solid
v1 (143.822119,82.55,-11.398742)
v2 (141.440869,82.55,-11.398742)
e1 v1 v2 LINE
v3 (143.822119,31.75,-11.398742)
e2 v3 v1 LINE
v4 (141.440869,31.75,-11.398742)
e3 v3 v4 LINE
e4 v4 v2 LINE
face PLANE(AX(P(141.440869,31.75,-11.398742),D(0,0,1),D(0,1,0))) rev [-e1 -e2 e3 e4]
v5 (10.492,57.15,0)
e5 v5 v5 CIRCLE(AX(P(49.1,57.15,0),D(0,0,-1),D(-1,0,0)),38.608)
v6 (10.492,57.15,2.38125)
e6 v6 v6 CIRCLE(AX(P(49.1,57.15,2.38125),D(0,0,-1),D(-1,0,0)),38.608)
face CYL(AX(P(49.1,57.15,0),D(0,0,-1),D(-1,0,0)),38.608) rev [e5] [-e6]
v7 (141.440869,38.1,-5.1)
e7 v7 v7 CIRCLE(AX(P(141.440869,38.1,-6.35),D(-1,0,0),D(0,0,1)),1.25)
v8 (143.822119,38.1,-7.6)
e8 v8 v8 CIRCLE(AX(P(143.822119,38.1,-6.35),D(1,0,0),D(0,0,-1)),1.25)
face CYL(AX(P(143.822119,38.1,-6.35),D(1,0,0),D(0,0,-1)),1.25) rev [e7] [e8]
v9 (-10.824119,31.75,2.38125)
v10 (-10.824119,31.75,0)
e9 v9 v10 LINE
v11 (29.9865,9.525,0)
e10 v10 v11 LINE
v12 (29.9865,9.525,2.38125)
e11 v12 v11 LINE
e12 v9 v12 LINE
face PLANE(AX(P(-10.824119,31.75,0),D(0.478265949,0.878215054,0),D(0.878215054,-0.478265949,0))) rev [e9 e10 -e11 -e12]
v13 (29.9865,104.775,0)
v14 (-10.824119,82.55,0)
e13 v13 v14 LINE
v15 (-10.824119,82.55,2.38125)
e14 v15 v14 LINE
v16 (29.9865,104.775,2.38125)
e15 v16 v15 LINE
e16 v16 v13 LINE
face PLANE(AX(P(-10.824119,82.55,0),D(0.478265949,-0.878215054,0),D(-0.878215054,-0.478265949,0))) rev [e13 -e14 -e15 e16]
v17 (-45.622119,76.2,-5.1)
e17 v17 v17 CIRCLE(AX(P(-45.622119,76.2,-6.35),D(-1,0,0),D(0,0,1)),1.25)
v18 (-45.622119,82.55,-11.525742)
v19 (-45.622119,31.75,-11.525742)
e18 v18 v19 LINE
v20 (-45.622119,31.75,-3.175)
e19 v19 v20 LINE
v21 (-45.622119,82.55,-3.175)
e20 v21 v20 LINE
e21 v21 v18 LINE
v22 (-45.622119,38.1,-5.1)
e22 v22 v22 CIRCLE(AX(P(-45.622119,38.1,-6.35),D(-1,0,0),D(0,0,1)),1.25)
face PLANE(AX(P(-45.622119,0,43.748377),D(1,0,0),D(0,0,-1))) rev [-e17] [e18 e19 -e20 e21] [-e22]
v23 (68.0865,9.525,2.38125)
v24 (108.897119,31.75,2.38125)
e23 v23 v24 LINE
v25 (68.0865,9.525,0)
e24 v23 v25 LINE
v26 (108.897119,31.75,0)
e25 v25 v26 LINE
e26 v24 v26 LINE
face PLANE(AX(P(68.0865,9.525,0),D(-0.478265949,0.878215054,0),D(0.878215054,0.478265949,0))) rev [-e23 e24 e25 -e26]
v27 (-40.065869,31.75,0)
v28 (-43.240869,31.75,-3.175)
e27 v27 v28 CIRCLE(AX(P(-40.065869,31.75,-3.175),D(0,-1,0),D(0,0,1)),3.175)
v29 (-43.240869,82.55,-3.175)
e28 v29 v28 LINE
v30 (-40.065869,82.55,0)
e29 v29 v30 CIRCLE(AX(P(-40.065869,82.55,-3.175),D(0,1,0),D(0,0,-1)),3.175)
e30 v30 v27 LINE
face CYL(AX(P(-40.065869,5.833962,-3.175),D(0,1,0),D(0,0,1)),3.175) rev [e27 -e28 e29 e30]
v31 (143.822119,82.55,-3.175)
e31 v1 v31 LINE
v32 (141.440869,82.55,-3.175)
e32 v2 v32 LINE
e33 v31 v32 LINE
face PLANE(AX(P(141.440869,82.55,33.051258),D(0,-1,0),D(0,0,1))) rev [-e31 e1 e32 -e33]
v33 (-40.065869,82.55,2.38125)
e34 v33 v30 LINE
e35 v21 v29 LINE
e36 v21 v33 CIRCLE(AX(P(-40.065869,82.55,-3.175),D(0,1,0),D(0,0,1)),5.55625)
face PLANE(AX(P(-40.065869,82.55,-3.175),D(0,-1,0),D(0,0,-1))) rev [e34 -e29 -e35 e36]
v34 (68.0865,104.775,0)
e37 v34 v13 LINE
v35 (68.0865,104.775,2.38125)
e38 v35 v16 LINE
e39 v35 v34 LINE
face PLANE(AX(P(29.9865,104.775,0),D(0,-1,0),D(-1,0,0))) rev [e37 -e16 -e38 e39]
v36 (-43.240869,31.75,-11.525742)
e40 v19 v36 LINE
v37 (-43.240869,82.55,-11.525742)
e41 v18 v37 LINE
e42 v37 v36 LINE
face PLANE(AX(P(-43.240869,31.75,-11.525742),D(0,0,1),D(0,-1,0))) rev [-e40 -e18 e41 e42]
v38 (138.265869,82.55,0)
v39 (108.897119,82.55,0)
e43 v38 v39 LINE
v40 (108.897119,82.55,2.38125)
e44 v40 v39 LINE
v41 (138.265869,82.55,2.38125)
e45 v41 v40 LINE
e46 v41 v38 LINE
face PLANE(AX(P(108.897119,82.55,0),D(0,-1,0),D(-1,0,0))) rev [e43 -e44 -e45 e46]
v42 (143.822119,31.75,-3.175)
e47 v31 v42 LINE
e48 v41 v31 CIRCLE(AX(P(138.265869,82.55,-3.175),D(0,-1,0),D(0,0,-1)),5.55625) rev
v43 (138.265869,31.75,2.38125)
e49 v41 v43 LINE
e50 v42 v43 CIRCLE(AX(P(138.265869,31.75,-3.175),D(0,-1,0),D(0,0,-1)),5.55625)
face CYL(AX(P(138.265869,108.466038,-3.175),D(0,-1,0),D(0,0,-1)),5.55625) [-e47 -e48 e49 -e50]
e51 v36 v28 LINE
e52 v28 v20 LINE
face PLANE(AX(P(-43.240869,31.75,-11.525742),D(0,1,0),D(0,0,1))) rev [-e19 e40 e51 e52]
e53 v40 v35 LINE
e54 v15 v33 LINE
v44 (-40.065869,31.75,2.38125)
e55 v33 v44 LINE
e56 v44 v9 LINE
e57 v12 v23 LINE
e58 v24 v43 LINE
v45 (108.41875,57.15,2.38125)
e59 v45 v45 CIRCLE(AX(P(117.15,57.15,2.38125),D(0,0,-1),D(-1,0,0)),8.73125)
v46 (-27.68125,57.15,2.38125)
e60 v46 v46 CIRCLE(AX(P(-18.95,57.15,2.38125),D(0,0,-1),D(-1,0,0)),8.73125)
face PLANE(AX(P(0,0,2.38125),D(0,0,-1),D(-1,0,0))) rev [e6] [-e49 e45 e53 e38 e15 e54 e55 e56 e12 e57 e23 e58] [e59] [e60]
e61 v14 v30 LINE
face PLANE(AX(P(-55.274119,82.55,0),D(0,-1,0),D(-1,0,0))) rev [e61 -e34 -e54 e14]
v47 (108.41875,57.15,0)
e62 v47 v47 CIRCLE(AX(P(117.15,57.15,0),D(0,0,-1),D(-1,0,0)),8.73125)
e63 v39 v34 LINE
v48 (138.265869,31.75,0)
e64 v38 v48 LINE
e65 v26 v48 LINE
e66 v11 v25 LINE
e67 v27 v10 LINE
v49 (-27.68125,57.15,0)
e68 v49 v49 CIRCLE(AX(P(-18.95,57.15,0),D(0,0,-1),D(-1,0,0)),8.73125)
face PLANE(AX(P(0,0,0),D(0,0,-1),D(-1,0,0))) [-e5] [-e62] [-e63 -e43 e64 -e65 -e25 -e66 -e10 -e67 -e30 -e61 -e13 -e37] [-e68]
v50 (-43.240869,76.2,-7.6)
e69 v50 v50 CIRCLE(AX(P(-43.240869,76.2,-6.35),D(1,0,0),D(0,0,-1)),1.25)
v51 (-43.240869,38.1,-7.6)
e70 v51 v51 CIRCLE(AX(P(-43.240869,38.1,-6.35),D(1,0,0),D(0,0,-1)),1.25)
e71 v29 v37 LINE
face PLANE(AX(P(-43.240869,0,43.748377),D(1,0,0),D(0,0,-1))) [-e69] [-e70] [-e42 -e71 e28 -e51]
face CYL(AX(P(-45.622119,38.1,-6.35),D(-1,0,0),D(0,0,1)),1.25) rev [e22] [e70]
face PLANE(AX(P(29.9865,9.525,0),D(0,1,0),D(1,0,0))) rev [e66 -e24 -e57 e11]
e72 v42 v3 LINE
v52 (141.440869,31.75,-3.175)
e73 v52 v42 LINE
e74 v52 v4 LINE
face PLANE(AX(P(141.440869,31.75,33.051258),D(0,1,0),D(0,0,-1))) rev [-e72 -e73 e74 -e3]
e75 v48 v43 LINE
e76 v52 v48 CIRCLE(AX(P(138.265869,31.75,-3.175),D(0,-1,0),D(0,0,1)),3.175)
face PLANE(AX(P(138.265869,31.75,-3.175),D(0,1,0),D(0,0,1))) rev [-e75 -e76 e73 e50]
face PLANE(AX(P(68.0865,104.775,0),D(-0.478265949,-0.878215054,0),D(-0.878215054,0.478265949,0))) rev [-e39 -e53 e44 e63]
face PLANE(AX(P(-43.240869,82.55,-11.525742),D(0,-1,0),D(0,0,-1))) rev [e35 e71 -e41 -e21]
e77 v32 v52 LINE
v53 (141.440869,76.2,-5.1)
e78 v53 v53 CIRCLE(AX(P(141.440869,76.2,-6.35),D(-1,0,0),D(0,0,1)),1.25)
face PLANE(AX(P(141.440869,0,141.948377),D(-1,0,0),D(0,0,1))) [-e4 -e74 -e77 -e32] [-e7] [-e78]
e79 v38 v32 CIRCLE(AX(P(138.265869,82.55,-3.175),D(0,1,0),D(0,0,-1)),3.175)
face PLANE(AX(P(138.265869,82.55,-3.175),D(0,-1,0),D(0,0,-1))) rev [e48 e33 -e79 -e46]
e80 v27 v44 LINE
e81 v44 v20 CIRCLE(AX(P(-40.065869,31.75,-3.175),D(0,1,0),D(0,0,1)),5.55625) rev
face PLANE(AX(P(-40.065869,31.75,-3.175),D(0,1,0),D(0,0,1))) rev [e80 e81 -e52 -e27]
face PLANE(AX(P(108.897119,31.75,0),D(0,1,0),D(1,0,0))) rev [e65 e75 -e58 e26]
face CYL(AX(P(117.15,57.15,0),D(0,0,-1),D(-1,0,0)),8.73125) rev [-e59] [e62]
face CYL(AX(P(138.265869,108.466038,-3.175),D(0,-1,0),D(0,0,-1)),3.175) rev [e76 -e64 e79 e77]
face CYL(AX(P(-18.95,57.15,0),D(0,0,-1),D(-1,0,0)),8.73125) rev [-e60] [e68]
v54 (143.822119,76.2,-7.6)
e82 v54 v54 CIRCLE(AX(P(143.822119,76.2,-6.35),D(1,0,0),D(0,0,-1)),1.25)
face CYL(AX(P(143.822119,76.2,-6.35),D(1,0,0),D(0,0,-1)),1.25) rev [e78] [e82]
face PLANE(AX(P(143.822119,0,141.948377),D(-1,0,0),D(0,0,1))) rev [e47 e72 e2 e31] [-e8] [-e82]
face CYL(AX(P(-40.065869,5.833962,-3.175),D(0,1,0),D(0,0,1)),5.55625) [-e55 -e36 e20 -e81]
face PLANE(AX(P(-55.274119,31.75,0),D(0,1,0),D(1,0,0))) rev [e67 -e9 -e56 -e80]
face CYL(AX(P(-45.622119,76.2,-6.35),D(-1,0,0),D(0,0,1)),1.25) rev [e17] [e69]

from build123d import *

# Parameters (mm, degrees)
BOSS_EXTRUDE1_DEPTH             = 2.38125
SKETCH2_R                       = 38.608
SKETCH2_R_2                     = 8.73125
CUT_EXTRUDE1_DEPTH              = 2.38125
SKETCHED_START                  = 31.75
SKETCHED_BEND1_DEPTH            = 50.8
SKETCHED_BEND1_2_DEPTH          = 50.8
SKETCHED_BEND2_DEPTH            = 50.8
SKETCHED_BEND2_2_DEPTH          = 50.8
TAP_DRILL_FOR_M3X0_5_TAP1_D     = 2.5
TAP_DRILL_FOR_M3X0_5_TAP1_DEPTH = 2.38125
TAP_DRILL_FOR_M3X0_5_TAP2_D     = 2.5


# Read off the part's stored shape, not the designer's step: Sketched Bend1, Sketched Bend2
with BuildPart() as part:
    # Sketch1 → Boss-Extrude1 (new body)
    with BuildSketch(Plane.XY):
        Polygon((-55.274119317, 31.75), (-10.824119317, 31.75), (29.9865, 9.525), (68.0865, 9.525), (108.897119317, 31.75), (153.347119317, 31.75), (153.347119317, 82.55), (108.897119317, 82.55), (68.0865, 104.775), (29.9865, 104.775), (-10.824119317, 82.55), (-55.274119317, 82.55), align=None)
    extrude(amount=BOSS_EXTRUDE1_DEPTH)

    # Sketch2 → Cut-Extrude1 (cut)
    with BuildSketch(Plane(origin=(0, 0, 0), x_dir=(-1, 0, 0), z_dir=(0, 0, -1))):
        with Locations((-49.1, 57.15)):
            Circle(SKETCH2_R)
        with Locations((-117.15, 57.15)):
            Circle(SKETCH2_R_2)
        with Locations((18.95, 57.15)):
            Circle(SKETCH2_R_2)
    extrude(amount=-CUT_EXTRUDE1_DEPTH, mode=Mode.SUBTRACT)

    # Sketched Bend1 outline → Sketched Bend1 (cut)
    with BuildSketch(Plane(origin=(0, 0, 0), x_dir=(1, 0, 0), z_dir=(0, 1, 0)).offset(SKETCHED_START)):
        with BuildLine():
            Line((153.347119317, 0), (142.825615918, 0))
            ThreePointArc((142.825615918, 0), (140.837913282, -1.750089228), (138.265869317, -2.38125))
            Line((138.265869317, -2.38125), (153.347119317, -2.38125))
            Line((153.347119317, -2.38125), (153.347119317, 0))
        make_face()
    extrude(amount=SKETCHED_BEND1_DEPTH, mode=Mode.SUBTRACT)

    # Sketched Bend1 2 outline → Sketched Bend1 2 (add)
    with BuildSketch(Plane(origin=(0, 0, 0), x_dir=(1, 0, 0), z_dir=(0, 1, 0)).offset(SKETCHED_START)):
        with BuildLine():
            Line((143.822119317, 3.175), (143.822119317, 11.398742286))
            Line((143.822119317, 11.398742286), (141.440869317, 11.398742286))
            Line((141.440869317, 11.398742286), (141.440869317, 3.175))
            ThreePointArc((141.440869317, 3.175), (140.510933348, 0.929935969), (138.265869317, 0))
            Line((138.265869317, 0), (142.825615918, 0))
            ThreePointArc((142.825615918, 0), (143.567143037, 1.511145738), (143.822119317, 3.175))
        make_face()
    extrude(amount=SKETCHED_BEND1_2_DEPTH)

    # Sketched Bend2 outline → Sketched Bend2 (cut)
    with BuildSketch(Plane(origin=(0, 0, 0), x_dir=(1, 0, 0), z_dir=(0, 1, 0)).offset(SKETCHED_START)):
        with BuildLine():
            ThreePointArc((-40.065869317, -2.38125), (-42.637913282, -1.750089228), (-44.625615918, 0))
            Line((-44.625615918, 0), (-55.274119317, 0))
            Line((-55.274119317, 0), (-55.274119317, -2.38125))
            Line((-55.274119317, -2.38125), (-40.065869317, -2.38125))
        make_face()
    extrude(amount=SKETCHED_BEND2_DEPTH, mode=Mode.SUBTRACT)

    # Sketched Bend2 2 outline → Sketched Bend2 2 (add)
    with BuildSketch(Plane(origin=(0, 0, 0), x_dir=(1, 0, 0), z_dir=(0, 1, 0)).offset(SKETCHED_START)):
        with BuildLine():
            ThreePointArc((-40.065869317, 0), (-42.310933347, 0.92993597), (-43.240869317, 3.175))
            Line((-43.240869317, 3.175), (-43.240869317, 11.525742286))
            Line((-43.240869317, 11.525742286), (-45.622119317, 11.525742286))
            Line((-45.622119317, 11.525742286), (-45.622119317, 3.175))
            ThreePointArc((-45.622119317, 3.175), (-45.367143037, 1.511145738), (-44.625615918, 0))
            Line((-44.625615918, 0), (-40.065869317, 0))
        make_face()
    extrude(amount=SKETCHED_BEND2_2_DEPTH)

    # Tap Drill for M3x0.5 Tap1
    with Locations(Plane(origin=(143.822119317, 0, 0), x_dir=(0, 0, -1), z_dir=(1, 0, 0))):
        with Locations((6.35, 76.2), (6.35, 38.1)):
            Hole(TAP_DRILL_FOR_M3X0_5_TAP1_D / 2, depth=TAP_DRILL_FOR_M3X0_5_TAP1_DEPTH)

    # Tap Drill for M3x0.5 Tap2 (through all)
    with Locations(Plane.ZY.offset(45.622119317)):
        with Locations((-6.35, 76.2), (-6.35, 38.1)):
            Hole(TAP_DRILL_FOR_M3X0_5_TAP2_D / 2)


solid = part.part
